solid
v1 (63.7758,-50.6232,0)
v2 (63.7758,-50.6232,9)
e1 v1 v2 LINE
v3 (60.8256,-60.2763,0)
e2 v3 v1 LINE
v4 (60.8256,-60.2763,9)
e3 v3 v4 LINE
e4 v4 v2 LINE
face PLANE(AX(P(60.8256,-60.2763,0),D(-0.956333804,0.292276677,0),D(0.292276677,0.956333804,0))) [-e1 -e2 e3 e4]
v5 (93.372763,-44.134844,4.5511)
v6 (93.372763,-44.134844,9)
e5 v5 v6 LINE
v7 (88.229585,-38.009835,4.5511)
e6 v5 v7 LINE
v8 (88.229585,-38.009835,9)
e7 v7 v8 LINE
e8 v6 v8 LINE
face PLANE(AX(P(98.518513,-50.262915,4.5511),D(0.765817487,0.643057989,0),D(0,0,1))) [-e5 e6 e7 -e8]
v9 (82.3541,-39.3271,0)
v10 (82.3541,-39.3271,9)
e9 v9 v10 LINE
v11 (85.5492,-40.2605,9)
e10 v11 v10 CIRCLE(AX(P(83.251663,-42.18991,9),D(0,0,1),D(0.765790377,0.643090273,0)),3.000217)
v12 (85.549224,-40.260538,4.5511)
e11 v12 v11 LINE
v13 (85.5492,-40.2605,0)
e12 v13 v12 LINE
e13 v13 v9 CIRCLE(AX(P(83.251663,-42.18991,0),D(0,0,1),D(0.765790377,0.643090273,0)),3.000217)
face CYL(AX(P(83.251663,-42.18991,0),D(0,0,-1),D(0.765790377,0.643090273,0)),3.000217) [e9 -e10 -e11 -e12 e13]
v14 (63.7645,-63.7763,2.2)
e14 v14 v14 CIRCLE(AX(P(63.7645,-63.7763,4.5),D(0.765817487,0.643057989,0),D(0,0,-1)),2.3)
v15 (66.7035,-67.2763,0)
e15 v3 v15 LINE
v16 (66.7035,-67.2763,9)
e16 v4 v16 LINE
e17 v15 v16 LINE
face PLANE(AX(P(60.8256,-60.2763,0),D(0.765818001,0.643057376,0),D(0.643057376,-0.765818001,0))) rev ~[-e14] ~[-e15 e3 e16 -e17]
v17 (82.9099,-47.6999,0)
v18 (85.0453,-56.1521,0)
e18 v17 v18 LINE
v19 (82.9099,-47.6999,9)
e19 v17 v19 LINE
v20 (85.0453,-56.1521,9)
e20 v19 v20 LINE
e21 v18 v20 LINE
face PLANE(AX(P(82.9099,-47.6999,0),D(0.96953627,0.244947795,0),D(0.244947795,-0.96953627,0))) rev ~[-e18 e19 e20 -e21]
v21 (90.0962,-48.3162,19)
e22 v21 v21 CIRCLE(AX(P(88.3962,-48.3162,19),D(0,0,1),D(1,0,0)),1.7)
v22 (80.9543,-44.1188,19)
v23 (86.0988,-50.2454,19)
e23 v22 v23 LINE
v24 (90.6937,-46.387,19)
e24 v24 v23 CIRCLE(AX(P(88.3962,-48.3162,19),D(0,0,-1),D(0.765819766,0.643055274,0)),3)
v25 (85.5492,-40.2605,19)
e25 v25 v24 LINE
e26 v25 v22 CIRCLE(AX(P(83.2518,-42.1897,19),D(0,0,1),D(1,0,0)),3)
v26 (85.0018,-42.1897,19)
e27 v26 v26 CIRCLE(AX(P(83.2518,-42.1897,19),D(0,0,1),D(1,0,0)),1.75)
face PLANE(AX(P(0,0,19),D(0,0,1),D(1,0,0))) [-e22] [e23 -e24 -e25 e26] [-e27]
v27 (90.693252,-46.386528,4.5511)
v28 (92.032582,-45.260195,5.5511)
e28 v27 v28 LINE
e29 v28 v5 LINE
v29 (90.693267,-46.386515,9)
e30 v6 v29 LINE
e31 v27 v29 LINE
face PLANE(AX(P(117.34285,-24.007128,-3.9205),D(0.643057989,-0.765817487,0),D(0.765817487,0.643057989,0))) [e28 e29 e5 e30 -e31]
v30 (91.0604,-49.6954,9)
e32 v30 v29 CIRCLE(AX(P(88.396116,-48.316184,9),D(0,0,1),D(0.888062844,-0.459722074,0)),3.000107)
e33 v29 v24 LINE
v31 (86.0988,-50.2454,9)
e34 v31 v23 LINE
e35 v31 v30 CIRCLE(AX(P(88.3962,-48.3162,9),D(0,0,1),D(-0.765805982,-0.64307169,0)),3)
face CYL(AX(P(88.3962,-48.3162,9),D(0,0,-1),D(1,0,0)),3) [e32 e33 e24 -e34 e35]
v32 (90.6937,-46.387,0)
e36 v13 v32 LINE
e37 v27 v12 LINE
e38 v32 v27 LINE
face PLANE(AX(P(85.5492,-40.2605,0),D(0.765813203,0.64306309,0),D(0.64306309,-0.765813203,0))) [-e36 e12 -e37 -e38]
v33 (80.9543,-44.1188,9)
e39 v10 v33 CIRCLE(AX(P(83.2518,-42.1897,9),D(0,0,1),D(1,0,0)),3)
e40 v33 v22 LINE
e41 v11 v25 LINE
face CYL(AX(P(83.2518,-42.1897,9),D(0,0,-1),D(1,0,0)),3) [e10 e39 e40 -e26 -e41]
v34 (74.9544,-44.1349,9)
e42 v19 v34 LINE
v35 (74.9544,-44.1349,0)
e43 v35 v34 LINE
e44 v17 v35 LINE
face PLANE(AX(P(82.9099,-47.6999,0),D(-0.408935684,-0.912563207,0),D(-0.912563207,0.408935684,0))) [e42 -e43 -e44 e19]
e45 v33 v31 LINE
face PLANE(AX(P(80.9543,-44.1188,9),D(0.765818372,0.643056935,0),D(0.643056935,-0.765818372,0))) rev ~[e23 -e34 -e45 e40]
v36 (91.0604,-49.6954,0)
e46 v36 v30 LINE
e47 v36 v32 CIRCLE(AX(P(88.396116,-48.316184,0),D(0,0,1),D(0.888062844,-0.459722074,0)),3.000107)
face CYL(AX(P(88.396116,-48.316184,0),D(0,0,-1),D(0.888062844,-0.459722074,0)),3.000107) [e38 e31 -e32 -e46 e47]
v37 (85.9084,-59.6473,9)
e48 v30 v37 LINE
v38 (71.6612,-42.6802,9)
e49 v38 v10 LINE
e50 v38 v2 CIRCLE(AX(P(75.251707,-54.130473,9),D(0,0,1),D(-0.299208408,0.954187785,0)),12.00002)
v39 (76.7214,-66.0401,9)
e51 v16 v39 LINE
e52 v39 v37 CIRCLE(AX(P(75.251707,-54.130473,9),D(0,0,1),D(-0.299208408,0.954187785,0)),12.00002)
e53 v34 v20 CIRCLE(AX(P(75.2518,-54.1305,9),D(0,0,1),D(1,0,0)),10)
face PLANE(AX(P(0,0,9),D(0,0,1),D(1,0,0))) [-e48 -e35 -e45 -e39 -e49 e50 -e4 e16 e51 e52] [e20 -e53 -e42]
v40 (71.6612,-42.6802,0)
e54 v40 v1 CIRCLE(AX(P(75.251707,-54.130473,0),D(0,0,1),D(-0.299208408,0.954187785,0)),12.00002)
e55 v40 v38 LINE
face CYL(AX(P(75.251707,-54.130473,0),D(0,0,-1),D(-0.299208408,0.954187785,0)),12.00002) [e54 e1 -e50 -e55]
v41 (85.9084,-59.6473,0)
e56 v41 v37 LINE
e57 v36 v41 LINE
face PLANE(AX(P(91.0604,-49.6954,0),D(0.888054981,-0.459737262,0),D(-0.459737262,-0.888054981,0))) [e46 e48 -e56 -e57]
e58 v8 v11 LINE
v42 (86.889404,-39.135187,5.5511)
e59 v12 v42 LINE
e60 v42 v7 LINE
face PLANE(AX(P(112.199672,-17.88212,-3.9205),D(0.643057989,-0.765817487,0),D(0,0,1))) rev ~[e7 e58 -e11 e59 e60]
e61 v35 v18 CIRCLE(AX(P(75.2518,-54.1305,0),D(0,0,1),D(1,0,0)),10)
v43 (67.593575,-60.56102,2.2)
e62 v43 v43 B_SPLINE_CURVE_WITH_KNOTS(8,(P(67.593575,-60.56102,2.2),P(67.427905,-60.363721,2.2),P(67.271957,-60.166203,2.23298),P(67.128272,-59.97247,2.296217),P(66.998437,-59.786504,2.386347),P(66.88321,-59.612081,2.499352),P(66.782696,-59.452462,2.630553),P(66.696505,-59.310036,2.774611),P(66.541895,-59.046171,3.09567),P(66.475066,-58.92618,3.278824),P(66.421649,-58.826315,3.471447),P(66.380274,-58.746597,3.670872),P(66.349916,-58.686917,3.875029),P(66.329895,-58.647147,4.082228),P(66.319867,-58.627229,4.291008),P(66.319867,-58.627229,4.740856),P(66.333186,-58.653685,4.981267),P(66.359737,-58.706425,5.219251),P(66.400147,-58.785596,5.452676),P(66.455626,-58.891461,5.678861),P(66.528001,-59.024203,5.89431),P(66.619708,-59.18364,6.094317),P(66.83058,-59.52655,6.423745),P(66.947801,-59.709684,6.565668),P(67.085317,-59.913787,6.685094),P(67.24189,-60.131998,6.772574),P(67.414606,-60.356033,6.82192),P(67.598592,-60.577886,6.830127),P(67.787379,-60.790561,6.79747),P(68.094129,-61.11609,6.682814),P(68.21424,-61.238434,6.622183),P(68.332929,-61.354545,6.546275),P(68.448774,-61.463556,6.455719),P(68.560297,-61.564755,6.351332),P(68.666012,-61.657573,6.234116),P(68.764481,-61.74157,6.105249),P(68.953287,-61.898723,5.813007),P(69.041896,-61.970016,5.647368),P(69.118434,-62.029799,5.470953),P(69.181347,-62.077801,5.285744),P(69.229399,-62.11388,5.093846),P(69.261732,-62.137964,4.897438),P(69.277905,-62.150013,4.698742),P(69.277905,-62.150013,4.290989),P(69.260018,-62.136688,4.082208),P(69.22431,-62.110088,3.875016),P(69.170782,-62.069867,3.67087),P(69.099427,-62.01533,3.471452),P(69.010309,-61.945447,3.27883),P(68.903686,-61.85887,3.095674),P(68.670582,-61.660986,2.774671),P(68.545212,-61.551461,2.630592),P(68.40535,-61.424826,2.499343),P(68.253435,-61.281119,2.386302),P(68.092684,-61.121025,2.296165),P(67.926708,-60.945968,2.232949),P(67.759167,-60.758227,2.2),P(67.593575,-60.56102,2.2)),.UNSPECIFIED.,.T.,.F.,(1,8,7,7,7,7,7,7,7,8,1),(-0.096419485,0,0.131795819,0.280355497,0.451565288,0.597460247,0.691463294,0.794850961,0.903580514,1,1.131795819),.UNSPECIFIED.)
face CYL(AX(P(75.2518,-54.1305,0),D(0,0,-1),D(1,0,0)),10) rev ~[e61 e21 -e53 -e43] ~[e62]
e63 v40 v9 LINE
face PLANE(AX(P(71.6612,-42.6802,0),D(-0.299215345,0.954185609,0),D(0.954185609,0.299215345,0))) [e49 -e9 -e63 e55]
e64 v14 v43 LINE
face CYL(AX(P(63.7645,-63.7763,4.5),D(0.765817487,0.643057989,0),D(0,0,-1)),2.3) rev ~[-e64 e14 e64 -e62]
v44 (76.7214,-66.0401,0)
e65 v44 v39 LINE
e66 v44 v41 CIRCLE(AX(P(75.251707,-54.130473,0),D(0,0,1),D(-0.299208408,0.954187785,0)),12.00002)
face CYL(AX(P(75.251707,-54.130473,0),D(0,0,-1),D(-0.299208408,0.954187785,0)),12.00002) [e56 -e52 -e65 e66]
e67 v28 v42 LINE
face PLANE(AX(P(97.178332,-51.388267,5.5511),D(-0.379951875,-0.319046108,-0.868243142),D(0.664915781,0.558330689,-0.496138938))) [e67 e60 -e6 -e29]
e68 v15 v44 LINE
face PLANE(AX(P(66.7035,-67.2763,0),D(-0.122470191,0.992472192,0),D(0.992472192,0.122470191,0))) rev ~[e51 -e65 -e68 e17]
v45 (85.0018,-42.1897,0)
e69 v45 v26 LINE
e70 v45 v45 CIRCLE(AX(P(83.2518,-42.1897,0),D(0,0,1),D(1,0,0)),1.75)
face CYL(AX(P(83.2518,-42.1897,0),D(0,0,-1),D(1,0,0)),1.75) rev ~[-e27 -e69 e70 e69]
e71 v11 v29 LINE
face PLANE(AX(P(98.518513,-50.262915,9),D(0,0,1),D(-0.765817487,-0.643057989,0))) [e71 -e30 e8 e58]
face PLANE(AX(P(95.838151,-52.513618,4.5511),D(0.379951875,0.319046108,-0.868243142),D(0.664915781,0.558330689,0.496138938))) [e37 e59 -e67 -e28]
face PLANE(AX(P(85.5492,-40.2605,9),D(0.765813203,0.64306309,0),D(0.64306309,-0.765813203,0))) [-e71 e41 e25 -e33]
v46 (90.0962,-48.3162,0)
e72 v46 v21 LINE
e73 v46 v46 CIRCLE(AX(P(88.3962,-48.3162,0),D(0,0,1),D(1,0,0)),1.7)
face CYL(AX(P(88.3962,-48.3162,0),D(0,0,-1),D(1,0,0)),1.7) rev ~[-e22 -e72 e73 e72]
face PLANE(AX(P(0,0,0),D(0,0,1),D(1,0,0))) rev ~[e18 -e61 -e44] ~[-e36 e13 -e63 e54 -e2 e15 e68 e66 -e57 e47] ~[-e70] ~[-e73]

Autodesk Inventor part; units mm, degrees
ref_plane "YZ Plane" through (0, 0, 0) normal (1, 0, 0) x (0, 1, 0)
ref_plane "XZ Plane" through (0, 0, 0) normal (0, 1, 0) x (-1, 0, 0)
ref_plane "XY Plane" through (0, 0, 0) normal (0, 0, 1) x (1, 0, 0)
sketch "Sketch1" plane through (0, 0, 0) normal (0, 0, 1) x (1, 0, 0)
  circle A0 centre (83.2518, -42.1897) radius 1.5 projected
  circle A1 centre (88.3962, -48.3162) radius 1.5 projected
  circle A2 centre (75.2518, -54.1305) radius 10 projected
  arc A3 (71.6612, -42.6802) -> (85.9084, -59.6473) centre (75.2518, -54.1305) ccw
  arc A4 (85.5492, -40.2605) -> (82.3541, -39.3271) centre (83.2518, -42.1897) ccw
  arc A5 (91.0604, -49.6954) -> (90.6937, -46.387) centre (88.3962, -48.3162) ccw
  line L0 (71.6612, -42.6802) -> (82.3541, -39.3271)
  line L1 (91.0604, -49.6954) -> (85.9084, -59.6473)
  line L2 (85.5492, -40.2605) -> (90.6937, -46.387)
  circle A6 centre (83.2518, -42.1897) radius 1.75
  circle A7 centre (88.3962, -48.3162) radius 1.7
  line L3 (88.1215, -43.3238) -> (66.062, -61.8472) construction
  line L4 (82.9099, -47.6999) -> (85.0453, -56.1521)
  line L5 (82.9099, -47.6999) -> (74.9544, -44.1349)
  circle A8 centre (75.2518, -54.1305) radius 9 construction
  line L6 (60.8256, -60.2763) -> (66.7035, -67.2763)
  line L7 (60.8256, -60.2763) -> (63.7758, -50.6232)
  line L8 (66.7035, -67.2763) -> (76.7214, -66.0401)
  point P0 (0, 0)
  dimension "d0" = 24
  dimension "d1" = 6
  dimension "d2" = 6
  dimension "d3" = 3.5
  dimension "d4" = 3.4
  dimension "d5" = 18
  dimension "d8" = 15
  dimension "d9" = 7
extrude "Extrusion1" add sketch "Sketch1" along normal blind 9 contours A2 L4 | L5 A2 | L0 A4 L2 A5 L1 A3 | A3 L8 L6 L7
sketch "Sketch2" plane through (66.7035, -67.2763, 0) normal (-0.7658175, -0.643058, 0) x (0, 0, 1)
  line L0 (9, 9.1406) -> (9, 0) projected
  line L1 (9, 4.5703) -> (0, 4.5703) construction
  line L2 (0, 9.1406) -> (0, 0) projected
  line L3 (0, 9.1406) -> (9, 9.1406) projected
  line L4 (4.5, 9.1406) -> (4.5, 0) construction
  line L5 (0, 0) -> (9, 0) projected
  point P0 (0, 94.4156)
  point P1 (4.5, 4.5703)
hole "Hole1" at (63.7645, -63.7763, 4.5) direction (0.7658175, 0.643058, 0) diameter 4.6 depth 8
ref_plane "Work Plane1" through (122.4886, -30.1352, -3.9205) normal (0.643058, -0.7658175, 0) x (0, 0, 1)
sketch "Sketch3" plane through (122.4886, -30.1352, -3.9205) normal (0.643058, -0.7658175, 0) x (0, 0, 1)
  line L0 (3.9205, 34.8) -> (12.9205, 34.8) projected
  line L1 (8.4716, 29.3) -> (8.4716, 32.8) projected
  line L2 (8.4716, 32.8) -> (8.4716, 33.3)
  line L3 (3.9205, 34.8) -> (12.9205, 34.8) projected
  line L4 (8.4716, 34.8) -> (9.4716, 33.05)
  line L5 (9.4716, 33.05) -> (8.4716, 31.3)
  line L6 (8.4716, 31.3) -> (12.9205, 31.3)
  line L7 (12.9205, 31.3) -> (12.9205, 34.8)
  line L8 (8.4716, 33.05) -> (10.4716, 33.05) construction
  point P0 (3.9205, 74.4253)
  dimension "d17" = 0.5
  dimension "d18" = 1
extrude "Extrusion2" add sketch "Sketch3" against normal blind 16
sketch "Sketch4" plane through (122.4886, -30.1352, -3.9205) normal (0.643058, -0.7658175, 0) x (0.7658175, 0.643058, 0)
  line L0 (-34.8, 12.9205) -> (-34.8, 8.4716) projected
  line L1 (-34.8, 8.4716) -> (-33.05, 9.4716) projected
  line L2 (-33.05, 9.4716) -> (-31.3, 8.4716) projected
  line L3 (-31.3, 8.4716) -> (-31.3, 12.9205) projected
  line L4 (-31.3, 12.9205) -> (-34.8, 12.9205) projected
  point P0 (-74.4253, 3.9205)
extrude "Extrusion3" cut sketch "Sketch4" against normal blind 8
sketch "Sketch5" plane through (0, 0, 9) normal (0, 0, 1) x (1, 0, 0)
  circle A0 centre (83.2518, -42.1897) radius 1.75 projected
  circle A1 centre (83.2518, -42.1897) radius 1.75 projected
  circle A2 centre (88.3962, -48.3162) radius 1.7 projected
  circle A3 centre (88.3962, -48.3162) radius 1.7 projected
  circle A4 centre (88.3962, -48.3162) radius 3
  circle A5 centre (83.2518, -42.1897) radius 3
  line L0 (85.5492, -40.2605) -> (90.6937, -46.387)
  line L1 (80.9543, -44.1188) -> (86.0988, -50.2454)
  point P0 (0, 0)
  dimension "d23" = 6
  dimension "d24" = 6
extrude "Extrusion4" add sketch "Sketch5" along normal blind 10
properties part number "marker_cerret"
